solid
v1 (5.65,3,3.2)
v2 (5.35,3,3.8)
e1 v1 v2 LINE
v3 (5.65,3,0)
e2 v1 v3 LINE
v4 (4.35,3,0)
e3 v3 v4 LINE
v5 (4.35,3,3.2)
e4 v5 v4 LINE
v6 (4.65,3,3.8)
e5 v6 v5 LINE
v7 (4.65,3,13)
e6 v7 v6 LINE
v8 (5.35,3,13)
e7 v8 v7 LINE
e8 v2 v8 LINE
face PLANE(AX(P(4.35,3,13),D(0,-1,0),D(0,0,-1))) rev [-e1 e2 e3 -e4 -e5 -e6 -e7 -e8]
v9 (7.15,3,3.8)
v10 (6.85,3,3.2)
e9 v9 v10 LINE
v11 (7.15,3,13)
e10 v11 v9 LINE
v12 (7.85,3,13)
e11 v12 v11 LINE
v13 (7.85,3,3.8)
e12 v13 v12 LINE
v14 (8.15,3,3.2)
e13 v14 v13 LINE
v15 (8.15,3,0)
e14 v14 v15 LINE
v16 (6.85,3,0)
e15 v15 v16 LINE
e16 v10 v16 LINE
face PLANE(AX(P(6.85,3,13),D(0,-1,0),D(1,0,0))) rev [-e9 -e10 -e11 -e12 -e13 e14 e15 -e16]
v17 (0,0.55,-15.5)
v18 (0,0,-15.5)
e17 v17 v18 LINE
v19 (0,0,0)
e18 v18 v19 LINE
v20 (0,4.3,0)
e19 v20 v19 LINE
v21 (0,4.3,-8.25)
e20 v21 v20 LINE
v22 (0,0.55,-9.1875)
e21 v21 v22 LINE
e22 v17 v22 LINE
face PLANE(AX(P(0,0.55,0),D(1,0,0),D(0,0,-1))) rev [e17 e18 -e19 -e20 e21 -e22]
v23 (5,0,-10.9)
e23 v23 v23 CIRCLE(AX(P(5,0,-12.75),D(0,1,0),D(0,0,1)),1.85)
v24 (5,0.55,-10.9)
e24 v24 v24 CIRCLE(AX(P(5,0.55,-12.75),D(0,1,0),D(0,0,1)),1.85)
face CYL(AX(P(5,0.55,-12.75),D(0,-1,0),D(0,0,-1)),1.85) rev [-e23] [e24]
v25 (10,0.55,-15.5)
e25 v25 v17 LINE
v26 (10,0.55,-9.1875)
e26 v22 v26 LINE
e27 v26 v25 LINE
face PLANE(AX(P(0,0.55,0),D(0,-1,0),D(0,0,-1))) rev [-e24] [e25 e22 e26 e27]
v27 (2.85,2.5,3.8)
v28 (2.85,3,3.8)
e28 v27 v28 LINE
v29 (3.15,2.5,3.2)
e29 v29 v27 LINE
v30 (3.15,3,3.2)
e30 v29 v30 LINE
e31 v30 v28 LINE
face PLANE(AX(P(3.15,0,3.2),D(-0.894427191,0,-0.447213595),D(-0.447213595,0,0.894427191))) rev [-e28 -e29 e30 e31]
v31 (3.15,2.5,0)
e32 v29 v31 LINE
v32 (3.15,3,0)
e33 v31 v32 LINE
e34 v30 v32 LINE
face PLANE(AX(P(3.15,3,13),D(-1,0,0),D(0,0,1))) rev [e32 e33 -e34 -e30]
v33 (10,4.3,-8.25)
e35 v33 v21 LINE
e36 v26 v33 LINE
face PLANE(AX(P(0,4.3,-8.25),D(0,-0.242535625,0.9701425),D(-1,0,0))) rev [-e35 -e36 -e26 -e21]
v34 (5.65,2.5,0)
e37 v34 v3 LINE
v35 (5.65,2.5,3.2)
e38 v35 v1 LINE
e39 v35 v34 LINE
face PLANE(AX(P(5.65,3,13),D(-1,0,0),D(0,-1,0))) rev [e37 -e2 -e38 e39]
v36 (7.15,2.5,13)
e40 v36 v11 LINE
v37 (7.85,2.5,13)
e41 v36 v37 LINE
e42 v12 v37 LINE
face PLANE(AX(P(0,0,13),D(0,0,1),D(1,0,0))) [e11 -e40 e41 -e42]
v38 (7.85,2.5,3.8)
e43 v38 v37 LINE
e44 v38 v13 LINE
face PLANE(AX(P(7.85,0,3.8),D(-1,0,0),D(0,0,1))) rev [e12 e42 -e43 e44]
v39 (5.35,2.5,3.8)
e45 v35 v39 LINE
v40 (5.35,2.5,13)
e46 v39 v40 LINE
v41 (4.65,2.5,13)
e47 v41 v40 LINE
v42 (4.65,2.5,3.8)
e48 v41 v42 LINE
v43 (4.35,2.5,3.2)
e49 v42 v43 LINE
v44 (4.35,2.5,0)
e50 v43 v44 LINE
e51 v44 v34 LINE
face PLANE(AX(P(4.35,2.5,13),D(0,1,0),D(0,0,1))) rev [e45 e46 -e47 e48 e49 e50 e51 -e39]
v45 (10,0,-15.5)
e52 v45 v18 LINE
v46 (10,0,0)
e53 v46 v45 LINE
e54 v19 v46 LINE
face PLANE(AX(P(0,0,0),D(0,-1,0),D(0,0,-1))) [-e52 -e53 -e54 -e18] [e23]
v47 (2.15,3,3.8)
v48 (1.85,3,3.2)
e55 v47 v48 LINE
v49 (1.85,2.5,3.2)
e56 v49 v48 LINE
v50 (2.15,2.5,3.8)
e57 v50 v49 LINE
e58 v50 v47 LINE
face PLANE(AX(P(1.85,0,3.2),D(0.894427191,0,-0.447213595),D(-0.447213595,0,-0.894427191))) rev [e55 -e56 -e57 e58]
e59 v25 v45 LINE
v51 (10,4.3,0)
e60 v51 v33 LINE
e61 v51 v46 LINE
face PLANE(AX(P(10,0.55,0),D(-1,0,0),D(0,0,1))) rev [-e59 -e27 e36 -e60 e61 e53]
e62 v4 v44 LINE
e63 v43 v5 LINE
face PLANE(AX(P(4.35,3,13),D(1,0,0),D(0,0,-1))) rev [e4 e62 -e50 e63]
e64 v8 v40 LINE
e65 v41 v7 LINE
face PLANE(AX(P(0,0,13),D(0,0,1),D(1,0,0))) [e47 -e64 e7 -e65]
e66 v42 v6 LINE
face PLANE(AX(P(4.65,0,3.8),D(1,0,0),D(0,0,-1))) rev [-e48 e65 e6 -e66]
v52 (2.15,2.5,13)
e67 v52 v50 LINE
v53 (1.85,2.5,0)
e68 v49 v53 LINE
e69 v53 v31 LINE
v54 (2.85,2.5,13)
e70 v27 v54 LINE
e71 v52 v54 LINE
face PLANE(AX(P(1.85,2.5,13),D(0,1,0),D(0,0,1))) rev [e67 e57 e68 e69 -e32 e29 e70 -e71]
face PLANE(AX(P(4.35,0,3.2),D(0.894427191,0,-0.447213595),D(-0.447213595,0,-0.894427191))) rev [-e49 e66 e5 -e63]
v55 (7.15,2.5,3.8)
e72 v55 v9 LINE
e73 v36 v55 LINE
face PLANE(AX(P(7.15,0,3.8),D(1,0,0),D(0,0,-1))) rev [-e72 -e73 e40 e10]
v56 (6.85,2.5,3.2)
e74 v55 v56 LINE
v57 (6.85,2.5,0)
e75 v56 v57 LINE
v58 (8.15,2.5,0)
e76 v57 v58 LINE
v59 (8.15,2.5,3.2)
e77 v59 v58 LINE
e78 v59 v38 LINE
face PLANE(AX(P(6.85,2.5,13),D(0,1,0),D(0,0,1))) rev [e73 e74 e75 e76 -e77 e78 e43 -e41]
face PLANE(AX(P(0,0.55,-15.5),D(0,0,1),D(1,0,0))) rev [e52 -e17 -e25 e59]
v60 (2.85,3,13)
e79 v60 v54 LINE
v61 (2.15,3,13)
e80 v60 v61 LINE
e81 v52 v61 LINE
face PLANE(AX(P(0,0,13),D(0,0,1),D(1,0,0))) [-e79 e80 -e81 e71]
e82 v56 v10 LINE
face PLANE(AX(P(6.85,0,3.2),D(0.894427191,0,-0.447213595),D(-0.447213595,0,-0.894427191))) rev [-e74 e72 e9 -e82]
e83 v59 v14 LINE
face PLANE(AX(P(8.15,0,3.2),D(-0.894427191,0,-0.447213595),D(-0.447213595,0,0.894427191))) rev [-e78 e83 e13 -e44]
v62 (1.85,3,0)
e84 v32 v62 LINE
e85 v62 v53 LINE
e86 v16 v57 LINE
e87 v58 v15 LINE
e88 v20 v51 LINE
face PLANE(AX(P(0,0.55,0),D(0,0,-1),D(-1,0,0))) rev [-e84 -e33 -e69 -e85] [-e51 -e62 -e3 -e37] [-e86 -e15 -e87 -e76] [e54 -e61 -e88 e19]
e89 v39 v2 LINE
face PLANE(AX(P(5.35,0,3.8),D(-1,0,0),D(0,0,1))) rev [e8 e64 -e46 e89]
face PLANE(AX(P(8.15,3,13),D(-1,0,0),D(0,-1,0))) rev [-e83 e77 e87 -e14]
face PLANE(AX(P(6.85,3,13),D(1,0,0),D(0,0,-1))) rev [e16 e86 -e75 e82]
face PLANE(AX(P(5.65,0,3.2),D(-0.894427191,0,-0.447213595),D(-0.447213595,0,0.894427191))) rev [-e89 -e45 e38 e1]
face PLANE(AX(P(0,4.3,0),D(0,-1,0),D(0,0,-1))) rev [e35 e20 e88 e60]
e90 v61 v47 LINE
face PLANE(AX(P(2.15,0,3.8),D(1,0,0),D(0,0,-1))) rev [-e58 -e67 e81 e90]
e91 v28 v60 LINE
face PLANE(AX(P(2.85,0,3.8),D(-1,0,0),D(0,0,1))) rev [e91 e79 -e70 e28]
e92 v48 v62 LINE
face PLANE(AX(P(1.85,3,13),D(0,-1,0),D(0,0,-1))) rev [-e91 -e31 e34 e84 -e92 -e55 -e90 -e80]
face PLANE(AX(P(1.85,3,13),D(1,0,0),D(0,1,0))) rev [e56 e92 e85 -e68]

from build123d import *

# Parameters (mm, degrees)
SKETCH1_W           = 10
SKETCH1_H           = 15.5
SKETCH1_R           = 1.85
BOSS_EXTRUDE1_DEPTH = 0.55
SKETCH2_W           = 10
SKETCH2_H           = 9.25
BOSS_EXTRUDE2_DEPTH = 3.75
CHAMFER1_SIZE       = 4
CHAMFER1_SIZE_2     = 1
SKETCH3_W           = 1.3
SKETCH3_H           = 0.5
BOSS_EXTRUDE3_DEPTH = 13
CUT_EXTRUDE1_DEPTH  = 19.688231591


with BuildPart() as part:
    # Sketch1 → Boss-Extrude1 (new body)
    with BuildSketch(Plane(origin=(0, 0, 0), x_dir=(1, 0, 0), z_dir=(0, 1, 0))):
        with Locations((5, 7.75)):
            Rectangle(SKETCH1_W, SKETCH1_H)
        with Locations(Location((5, 12.75, 0), (0, 0, 270))):
            Circle(SKETCH1_R, mode=Mode.SUBTRACT)
    extrude(amount=BOSS_EXTRUDE1_DEPTH)

    # Sketch2 → Boss-Extrude2 (add)
    with BuildSketch(Plane(origin=(0, 0.55, 0), x_dir=(1, 0, 0), z_dir=(0, 1, 0))):
        with Locations((5, 4.625)):
            Rectangle(SKETCH2_W, SKETCH2_H)
    extrude(amount=BOSS_EXTRUDE2_DEPTH)

    # Chamfer1
    # the kernel refuses this chamfer: 4, 1 mm, written as the material it takes off along each edge
    with BuildSketch(Plane(origin=(20.388509999, 4.3, -9.25), x_dir=(0, -0.9999563942249224, -0.00933861064031752), z_dir=(-1, 0, 0))) as chamfer1_piece_1_section:
        Polygon((CHAMFER1_SIZE * 0.999956394225, CHAMFER1_SIZE * 0.00933861064032), (-CHAMFER1_SIZE_2 * 0.00933861064032, CHAMFER1_SIZE_2 * 0.999956394225), (0, 0), align=None)
    chamfer1_piece_1 = extrude(amount=30.777019998, mode=Mode.PRIVATE)
    chamfer1_piece_1 = split(chamfer1_piece_1, bisect_by=Plane(origin=(5, 0.55, -8.951597726), z_dir=(0, 1, 0)), keep=Keep.TOP, mode=Mode.PRIVATE)
    add(chamfer1_piece_1, mode=Mode.SUBTRACT)

    # Sketch3 → Boss-Extrude3 (add)
    with BuildSketch(Plane.XY):
        with Locations((2.5, 2.75)):
            Rectangle(SKETCH3_W, SKETCH3_H)
        with Locations((5, 2.75)):
            Rectangle(SKETCH3_W, SKETCH3_H)
        with Locations((7.5, 2.75)):
            Rectangle(SKETCH3_W, SKETCH3_H)
    extrude(amount=BOSS_EXTRUDE3_DEPTH)

    # Sketch4 → Cut-Extrude1 (cut, through all)
    with BuildSketch(Plane(origin=(0, 3, 0), x_dir=(1, 0, 0), z_dir=(0, 1, 0))):
        Polygon((1.85, -3.2), (2.15, -3.8), (2.15, -13), (1.85, -13), align=None)
        Polygon((4.35, -3.2), (4.65, -3.8), (4.65, -13), (4.35, -13), align=None)
        Polygon((6.85, -3.2), (7.15, -3.8), (7.15, -13), (6.85, -13), align=None)
        Polygon((3.15, -3.2), (2.85, -3.8), (2.85, -13), (3.15, -13), align=None)
        Polygon((5.65, -3.2), (5.35, -3.8), (5.35, -13), (5.65, -13), align=None)
        Polygon((8.15, -3.2), (7.85, -3.8), (7.85, -13), (8.15, -13), align=None)
    extrude(amount=-CUT_EXTRUDE1_DEPTH, mode=Mode.SUBTRACT)


solid = part.part
